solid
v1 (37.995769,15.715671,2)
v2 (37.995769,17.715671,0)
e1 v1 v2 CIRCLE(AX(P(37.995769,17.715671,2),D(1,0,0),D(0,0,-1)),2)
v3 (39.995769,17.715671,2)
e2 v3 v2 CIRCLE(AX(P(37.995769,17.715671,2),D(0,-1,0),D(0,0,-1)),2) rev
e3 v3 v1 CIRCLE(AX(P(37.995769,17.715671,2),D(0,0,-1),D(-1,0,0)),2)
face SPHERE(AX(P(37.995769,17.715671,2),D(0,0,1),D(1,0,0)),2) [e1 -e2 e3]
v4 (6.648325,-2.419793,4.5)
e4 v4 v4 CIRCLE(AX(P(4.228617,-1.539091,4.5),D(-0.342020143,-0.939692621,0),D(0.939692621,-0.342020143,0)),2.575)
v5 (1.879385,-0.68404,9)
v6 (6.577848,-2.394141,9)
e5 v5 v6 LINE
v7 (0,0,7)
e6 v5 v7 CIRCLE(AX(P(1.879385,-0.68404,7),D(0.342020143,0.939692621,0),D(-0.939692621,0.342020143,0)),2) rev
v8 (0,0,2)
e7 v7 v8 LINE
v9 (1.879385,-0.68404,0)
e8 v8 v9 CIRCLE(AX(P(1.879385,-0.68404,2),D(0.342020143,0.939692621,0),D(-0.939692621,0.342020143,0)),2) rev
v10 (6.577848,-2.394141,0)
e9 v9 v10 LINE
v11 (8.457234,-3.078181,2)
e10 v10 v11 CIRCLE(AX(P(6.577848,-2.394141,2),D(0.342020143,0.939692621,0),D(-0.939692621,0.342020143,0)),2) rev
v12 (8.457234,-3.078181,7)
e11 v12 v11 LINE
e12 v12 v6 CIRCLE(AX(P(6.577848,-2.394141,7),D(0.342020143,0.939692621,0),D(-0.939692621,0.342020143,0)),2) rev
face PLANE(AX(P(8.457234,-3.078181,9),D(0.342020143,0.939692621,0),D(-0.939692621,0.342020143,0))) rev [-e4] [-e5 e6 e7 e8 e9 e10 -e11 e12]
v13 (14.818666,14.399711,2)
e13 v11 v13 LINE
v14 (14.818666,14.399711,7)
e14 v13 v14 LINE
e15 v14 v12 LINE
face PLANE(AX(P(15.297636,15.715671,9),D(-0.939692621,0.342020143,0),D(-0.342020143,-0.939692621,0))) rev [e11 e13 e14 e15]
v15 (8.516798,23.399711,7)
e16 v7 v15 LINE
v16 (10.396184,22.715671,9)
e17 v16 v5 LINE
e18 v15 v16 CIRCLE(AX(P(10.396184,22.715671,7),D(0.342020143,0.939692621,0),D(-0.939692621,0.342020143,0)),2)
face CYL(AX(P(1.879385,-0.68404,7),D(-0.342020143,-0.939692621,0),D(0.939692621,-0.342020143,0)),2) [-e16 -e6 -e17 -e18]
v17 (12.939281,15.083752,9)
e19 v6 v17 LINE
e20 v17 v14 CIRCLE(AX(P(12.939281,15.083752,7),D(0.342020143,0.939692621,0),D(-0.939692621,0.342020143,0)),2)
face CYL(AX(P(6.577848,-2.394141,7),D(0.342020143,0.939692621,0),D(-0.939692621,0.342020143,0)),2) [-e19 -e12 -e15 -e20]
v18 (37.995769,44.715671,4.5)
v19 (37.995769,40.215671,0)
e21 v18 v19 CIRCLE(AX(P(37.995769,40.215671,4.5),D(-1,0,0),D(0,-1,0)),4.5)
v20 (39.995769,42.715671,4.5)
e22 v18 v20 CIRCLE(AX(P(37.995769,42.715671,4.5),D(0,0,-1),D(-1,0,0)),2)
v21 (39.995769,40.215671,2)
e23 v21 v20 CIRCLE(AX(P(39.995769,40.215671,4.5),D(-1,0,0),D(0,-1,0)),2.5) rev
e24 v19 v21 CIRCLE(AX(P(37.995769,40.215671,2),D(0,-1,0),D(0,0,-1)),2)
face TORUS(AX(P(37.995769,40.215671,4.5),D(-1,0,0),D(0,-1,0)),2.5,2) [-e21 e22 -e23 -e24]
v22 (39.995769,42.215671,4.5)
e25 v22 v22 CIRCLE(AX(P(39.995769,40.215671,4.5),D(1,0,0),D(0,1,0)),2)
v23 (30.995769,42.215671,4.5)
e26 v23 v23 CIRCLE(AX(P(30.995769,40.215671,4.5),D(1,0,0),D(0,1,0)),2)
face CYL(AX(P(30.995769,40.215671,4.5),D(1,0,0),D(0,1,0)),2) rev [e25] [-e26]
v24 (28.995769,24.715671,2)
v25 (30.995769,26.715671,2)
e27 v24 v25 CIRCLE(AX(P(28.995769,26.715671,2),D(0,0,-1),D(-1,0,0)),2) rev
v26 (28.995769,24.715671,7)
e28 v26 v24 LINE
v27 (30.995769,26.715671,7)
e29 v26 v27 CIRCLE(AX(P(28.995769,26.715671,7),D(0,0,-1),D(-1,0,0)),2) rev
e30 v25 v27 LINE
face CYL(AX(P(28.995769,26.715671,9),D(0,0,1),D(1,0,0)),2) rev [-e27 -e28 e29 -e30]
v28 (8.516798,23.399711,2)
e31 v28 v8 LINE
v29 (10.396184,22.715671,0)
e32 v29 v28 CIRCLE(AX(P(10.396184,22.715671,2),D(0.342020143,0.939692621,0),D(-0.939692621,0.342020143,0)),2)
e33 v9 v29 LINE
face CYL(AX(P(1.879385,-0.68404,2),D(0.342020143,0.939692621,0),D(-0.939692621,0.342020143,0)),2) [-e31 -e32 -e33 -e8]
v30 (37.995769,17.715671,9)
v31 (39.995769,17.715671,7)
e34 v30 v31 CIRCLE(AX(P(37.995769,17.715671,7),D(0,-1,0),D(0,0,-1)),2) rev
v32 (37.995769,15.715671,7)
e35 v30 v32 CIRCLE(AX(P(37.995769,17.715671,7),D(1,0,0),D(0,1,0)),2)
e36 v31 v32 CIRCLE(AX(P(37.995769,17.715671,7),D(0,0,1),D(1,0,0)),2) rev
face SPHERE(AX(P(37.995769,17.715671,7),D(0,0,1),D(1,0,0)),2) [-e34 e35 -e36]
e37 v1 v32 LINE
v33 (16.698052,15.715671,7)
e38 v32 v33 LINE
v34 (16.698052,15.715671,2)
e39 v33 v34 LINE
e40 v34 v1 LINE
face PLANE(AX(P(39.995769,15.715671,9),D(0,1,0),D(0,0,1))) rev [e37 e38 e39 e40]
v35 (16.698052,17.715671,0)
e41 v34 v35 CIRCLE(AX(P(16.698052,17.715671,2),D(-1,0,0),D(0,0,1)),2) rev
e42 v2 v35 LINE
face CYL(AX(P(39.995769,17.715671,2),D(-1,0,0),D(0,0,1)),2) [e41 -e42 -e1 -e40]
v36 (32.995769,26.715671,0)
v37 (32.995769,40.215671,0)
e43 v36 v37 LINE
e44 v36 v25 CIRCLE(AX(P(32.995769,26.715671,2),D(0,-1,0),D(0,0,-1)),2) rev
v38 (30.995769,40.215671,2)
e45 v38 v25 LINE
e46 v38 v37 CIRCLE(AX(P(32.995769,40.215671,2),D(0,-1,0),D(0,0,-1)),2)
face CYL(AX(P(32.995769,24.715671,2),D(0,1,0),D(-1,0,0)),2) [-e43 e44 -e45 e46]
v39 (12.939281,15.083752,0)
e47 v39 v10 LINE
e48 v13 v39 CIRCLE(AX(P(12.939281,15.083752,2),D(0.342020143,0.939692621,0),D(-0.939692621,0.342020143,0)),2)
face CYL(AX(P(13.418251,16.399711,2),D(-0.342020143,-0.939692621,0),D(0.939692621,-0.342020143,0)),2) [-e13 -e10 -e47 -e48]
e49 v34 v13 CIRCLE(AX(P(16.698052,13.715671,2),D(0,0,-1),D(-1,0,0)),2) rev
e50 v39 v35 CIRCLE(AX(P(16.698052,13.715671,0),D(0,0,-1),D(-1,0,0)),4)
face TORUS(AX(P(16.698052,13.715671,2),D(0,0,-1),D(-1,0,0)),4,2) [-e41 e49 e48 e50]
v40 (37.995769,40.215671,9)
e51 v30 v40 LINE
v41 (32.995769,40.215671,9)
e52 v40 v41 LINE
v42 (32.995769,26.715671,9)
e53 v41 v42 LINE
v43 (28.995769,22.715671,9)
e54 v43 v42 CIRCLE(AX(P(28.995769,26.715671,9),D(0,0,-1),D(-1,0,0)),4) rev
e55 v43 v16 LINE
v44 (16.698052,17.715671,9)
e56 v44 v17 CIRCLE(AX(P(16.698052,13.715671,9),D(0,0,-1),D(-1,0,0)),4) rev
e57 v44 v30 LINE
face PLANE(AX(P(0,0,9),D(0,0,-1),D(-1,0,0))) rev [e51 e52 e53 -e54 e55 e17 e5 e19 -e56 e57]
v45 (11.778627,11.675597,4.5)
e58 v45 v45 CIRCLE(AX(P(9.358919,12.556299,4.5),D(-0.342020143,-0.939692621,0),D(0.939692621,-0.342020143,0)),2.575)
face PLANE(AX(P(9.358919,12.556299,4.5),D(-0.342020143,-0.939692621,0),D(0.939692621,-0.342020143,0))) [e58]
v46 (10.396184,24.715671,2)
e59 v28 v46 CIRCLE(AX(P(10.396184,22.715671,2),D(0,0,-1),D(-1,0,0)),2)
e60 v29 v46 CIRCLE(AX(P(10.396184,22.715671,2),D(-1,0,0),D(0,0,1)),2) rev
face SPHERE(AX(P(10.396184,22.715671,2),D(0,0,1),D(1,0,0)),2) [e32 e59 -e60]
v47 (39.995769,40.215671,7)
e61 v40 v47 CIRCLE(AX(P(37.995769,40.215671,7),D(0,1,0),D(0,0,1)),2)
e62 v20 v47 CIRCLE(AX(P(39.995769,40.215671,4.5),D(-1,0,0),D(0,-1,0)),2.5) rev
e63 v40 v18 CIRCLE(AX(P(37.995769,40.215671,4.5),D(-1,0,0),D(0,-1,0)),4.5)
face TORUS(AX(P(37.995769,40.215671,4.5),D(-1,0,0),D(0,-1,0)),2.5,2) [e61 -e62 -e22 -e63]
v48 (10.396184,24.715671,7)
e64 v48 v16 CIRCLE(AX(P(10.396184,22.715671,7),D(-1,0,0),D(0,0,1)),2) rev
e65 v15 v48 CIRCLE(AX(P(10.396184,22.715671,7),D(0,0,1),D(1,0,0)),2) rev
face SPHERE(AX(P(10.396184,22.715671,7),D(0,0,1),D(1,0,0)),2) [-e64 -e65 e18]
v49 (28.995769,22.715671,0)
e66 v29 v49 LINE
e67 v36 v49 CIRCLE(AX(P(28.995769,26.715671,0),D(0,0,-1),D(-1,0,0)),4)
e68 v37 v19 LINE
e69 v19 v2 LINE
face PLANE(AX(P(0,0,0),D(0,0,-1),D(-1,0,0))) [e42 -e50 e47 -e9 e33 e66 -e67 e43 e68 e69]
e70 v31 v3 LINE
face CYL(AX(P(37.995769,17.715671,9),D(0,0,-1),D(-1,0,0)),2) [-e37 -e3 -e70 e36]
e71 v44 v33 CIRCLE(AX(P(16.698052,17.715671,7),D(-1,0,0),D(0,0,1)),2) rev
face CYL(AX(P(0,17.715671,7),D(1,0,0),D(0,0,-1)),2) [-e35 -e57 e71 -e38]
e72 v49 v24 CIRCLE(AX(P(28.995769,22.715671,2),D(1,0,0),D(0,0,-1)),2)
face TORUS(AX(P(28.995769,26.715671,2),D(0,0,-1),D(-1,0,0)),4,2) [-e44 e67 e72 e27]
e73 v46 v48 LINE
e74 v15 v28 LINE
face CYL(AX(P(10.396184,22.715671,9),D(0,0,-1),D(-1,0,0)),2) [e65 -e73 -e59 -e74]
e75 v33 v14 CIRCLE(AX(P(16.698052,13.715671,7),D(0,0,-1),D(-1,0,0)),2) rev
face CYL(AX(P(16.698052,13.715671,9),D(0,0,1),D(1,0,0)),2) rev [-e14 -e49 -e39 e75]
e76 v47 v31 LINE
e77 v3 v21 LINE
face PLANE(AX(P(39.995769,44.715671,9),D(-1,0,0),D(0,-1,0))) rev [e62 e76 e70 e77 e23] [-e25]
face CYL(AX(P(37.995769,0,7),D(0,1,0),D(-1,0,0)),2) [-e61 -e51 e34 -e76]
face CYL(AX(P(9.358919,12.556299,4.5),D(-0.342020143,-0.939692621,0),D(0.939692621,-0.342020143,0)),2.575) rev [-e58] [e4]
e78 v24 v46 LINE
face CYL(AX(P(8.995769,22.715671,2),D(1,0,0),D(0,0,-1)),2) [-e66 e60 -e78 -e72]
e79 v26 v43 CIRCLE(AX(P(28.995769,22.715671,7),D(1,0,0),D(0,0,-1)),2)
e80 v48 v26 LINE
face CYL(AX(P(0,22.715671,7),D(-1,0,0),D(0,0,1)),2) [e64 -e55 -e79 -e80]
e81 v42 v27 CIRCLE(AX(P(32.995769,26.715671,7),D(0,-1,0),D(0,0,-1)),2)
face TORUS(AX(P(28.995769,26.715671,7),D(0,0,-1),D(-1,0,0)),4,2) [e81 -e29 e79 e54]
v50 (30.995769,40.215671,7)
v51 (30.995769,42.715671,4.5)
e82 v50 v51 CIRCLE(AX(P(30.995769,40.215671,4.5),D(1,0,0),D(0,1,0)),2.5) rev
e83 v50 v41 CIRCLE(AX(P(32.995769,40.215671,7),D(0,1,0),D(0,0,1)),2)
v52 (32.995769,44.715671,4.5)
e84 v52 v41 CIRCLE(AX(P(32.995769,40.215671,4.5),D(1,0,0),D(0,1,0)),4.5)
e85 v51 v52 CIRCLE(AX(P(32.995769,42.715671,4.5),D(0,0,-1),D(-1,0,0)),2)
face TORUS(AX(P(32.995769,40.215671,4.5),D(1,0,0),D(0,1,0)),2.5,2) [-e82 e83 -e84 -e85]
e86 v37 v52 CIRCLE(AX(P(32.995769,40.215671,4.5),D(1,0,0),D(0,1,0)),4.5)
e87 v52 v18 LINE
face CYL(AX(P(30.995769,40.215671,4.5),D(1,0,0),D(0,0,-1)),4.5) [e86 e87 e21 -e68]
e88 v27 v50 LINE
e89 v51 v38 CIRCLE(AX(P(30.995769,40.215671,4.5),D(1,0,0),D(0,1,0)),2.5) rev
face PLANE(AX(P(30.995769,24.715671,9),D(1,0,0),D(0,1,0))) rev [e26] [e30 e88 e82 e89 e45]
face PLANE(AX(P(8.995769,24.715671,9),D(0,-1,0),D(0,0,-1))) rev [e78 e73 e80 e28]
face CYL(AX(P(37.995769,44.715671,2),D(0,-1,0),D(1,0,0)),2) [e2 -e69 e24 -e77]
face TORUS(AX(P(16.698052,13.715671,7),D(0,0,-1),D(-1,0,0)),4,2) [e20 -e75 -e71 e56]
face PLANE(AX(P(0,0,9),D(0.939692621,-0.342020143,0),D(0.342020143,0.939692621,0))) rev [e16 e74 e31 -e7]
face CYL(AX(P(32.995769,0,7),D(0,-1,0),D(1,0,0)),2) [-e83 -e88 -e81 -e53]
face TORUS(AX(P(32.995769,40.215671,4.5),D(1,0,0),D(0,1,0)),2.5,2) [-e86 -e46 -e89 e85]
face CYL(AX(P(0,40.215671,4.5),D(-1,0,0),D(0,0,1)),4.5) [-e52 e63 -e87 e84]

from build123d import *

# Parameters (mm, degrees)
Y_KSEKLIK_EKSTR_ZYON1_DEPTH = 9
RADYUS1_R                   = 4.5
IZIM2_R                     = 2
KES_EKSTR_ZYON1_DEPTH       = 9
IZIM3_R                     = 2.575
KES_EKSTR_ZYON2_DEPTH       = 15
RADYUS2_R                   = 2


with BuildPart() as part:
    # Çizim1 → Yükseklik-Ekstrüzyon1 (new body)
    with BuildSketch(Plane.XY):
        Polygon((0, 0), (8.99576861, 24.715671126), (30.99576861, 24.715671126), (30.99576861, 44.715671126), (39.99576861, 44.715671126), (39.99576861, 15.715671126), (15.297636454, 15.715671126), (8.457233587, -3.07818129), align=None)
    extrude(amount=Y_KSEKLIK_EKSTR_ZYON1_DEPTH)

    # Radyus1
    radyus1_edges = [part.edges().sort_by_distance(p)[0] for p in [
        (35.49576861, 44.715671126, 0),
        (35.49576861, 44.715671126, 9),
    ]]
    fillet(radyus1_edges, radius=RADYUS1_R - 0.0001)  # a hair under: the kernel refuses the full size

    # Çizim2 → Kes-Ekstrüzyon1 (cut)
    with BuildSketch(Plane(origin=(39.99576861, 0, 0), x_dir=(0, 0, -1), z_dir=(1, 0, 0))):
        with Locations(Location((-4.5, 40.215671126, 0), (0, 0, 90))):
            Circle(IZIM2_R)
    extrude(amount=-KES_EKSTR_ZYON1_DEPTH, mode=Mode.SUBTRACT)

    # Çizim3 → Kes-Ekstrüzyon2 (cut)
    with BuildSketch(Plane(origin=(0, 0, 0), x_dir=(0.9396926207859082, -0.34202014332566943, 0), z_dir=(-0.34202014332566943, -0.9396926207859082, 0))):
        with Locations((4.5, 4.5)):
            Circle(IZIM3_R)
    extrude(amount=-KES_EKSTR_ZYON2_DEPTH, mode=Mode.SUBTRACT)

    # Radyus2
    radyus2_edges = [part.edges().sort_by_distance(p)[0] for p in [
        (27.646702532, 15.715671126, 9),
        (11.87743502, 6.318744918, 0),
        (39.99576861, 27.965721126, 9),
        (8.99576861, 24.715671126, 4.5),
        (30.99576861, 24.715671126, 4.5),
        (39.99576861, 15.715671126, 4.5),
        (15.297636454, 15.715671126, 4.5),
        (19.99576861, 24.715671126, 9),
        (30.99576861, 32.465721126, 0),
        (30.99576861, 32.465721126, 9),
        (30.99576861, 43.39768093, 7.682009805),
        (30.99576861, 43.39768093, 1.317990195),
        (4.497884305, 12.357835563, 9),
        (39.99576861, 43.39768093, 7.682009805),
        (39.99576861, 43.39768093, 1.317990195),
        (11.87743502, 6.318744918, 9),
        (4.497884305, 12.357835563, 0),
        (19.99576861, 24.715671126, 0),
        (39.99576861, 27.965721126, 0),
        (27.646702532, 15.715671126, 0),
    ]]
    fillet(radyus2_edges, radius=RADYUS2_R)


solid = part.part
